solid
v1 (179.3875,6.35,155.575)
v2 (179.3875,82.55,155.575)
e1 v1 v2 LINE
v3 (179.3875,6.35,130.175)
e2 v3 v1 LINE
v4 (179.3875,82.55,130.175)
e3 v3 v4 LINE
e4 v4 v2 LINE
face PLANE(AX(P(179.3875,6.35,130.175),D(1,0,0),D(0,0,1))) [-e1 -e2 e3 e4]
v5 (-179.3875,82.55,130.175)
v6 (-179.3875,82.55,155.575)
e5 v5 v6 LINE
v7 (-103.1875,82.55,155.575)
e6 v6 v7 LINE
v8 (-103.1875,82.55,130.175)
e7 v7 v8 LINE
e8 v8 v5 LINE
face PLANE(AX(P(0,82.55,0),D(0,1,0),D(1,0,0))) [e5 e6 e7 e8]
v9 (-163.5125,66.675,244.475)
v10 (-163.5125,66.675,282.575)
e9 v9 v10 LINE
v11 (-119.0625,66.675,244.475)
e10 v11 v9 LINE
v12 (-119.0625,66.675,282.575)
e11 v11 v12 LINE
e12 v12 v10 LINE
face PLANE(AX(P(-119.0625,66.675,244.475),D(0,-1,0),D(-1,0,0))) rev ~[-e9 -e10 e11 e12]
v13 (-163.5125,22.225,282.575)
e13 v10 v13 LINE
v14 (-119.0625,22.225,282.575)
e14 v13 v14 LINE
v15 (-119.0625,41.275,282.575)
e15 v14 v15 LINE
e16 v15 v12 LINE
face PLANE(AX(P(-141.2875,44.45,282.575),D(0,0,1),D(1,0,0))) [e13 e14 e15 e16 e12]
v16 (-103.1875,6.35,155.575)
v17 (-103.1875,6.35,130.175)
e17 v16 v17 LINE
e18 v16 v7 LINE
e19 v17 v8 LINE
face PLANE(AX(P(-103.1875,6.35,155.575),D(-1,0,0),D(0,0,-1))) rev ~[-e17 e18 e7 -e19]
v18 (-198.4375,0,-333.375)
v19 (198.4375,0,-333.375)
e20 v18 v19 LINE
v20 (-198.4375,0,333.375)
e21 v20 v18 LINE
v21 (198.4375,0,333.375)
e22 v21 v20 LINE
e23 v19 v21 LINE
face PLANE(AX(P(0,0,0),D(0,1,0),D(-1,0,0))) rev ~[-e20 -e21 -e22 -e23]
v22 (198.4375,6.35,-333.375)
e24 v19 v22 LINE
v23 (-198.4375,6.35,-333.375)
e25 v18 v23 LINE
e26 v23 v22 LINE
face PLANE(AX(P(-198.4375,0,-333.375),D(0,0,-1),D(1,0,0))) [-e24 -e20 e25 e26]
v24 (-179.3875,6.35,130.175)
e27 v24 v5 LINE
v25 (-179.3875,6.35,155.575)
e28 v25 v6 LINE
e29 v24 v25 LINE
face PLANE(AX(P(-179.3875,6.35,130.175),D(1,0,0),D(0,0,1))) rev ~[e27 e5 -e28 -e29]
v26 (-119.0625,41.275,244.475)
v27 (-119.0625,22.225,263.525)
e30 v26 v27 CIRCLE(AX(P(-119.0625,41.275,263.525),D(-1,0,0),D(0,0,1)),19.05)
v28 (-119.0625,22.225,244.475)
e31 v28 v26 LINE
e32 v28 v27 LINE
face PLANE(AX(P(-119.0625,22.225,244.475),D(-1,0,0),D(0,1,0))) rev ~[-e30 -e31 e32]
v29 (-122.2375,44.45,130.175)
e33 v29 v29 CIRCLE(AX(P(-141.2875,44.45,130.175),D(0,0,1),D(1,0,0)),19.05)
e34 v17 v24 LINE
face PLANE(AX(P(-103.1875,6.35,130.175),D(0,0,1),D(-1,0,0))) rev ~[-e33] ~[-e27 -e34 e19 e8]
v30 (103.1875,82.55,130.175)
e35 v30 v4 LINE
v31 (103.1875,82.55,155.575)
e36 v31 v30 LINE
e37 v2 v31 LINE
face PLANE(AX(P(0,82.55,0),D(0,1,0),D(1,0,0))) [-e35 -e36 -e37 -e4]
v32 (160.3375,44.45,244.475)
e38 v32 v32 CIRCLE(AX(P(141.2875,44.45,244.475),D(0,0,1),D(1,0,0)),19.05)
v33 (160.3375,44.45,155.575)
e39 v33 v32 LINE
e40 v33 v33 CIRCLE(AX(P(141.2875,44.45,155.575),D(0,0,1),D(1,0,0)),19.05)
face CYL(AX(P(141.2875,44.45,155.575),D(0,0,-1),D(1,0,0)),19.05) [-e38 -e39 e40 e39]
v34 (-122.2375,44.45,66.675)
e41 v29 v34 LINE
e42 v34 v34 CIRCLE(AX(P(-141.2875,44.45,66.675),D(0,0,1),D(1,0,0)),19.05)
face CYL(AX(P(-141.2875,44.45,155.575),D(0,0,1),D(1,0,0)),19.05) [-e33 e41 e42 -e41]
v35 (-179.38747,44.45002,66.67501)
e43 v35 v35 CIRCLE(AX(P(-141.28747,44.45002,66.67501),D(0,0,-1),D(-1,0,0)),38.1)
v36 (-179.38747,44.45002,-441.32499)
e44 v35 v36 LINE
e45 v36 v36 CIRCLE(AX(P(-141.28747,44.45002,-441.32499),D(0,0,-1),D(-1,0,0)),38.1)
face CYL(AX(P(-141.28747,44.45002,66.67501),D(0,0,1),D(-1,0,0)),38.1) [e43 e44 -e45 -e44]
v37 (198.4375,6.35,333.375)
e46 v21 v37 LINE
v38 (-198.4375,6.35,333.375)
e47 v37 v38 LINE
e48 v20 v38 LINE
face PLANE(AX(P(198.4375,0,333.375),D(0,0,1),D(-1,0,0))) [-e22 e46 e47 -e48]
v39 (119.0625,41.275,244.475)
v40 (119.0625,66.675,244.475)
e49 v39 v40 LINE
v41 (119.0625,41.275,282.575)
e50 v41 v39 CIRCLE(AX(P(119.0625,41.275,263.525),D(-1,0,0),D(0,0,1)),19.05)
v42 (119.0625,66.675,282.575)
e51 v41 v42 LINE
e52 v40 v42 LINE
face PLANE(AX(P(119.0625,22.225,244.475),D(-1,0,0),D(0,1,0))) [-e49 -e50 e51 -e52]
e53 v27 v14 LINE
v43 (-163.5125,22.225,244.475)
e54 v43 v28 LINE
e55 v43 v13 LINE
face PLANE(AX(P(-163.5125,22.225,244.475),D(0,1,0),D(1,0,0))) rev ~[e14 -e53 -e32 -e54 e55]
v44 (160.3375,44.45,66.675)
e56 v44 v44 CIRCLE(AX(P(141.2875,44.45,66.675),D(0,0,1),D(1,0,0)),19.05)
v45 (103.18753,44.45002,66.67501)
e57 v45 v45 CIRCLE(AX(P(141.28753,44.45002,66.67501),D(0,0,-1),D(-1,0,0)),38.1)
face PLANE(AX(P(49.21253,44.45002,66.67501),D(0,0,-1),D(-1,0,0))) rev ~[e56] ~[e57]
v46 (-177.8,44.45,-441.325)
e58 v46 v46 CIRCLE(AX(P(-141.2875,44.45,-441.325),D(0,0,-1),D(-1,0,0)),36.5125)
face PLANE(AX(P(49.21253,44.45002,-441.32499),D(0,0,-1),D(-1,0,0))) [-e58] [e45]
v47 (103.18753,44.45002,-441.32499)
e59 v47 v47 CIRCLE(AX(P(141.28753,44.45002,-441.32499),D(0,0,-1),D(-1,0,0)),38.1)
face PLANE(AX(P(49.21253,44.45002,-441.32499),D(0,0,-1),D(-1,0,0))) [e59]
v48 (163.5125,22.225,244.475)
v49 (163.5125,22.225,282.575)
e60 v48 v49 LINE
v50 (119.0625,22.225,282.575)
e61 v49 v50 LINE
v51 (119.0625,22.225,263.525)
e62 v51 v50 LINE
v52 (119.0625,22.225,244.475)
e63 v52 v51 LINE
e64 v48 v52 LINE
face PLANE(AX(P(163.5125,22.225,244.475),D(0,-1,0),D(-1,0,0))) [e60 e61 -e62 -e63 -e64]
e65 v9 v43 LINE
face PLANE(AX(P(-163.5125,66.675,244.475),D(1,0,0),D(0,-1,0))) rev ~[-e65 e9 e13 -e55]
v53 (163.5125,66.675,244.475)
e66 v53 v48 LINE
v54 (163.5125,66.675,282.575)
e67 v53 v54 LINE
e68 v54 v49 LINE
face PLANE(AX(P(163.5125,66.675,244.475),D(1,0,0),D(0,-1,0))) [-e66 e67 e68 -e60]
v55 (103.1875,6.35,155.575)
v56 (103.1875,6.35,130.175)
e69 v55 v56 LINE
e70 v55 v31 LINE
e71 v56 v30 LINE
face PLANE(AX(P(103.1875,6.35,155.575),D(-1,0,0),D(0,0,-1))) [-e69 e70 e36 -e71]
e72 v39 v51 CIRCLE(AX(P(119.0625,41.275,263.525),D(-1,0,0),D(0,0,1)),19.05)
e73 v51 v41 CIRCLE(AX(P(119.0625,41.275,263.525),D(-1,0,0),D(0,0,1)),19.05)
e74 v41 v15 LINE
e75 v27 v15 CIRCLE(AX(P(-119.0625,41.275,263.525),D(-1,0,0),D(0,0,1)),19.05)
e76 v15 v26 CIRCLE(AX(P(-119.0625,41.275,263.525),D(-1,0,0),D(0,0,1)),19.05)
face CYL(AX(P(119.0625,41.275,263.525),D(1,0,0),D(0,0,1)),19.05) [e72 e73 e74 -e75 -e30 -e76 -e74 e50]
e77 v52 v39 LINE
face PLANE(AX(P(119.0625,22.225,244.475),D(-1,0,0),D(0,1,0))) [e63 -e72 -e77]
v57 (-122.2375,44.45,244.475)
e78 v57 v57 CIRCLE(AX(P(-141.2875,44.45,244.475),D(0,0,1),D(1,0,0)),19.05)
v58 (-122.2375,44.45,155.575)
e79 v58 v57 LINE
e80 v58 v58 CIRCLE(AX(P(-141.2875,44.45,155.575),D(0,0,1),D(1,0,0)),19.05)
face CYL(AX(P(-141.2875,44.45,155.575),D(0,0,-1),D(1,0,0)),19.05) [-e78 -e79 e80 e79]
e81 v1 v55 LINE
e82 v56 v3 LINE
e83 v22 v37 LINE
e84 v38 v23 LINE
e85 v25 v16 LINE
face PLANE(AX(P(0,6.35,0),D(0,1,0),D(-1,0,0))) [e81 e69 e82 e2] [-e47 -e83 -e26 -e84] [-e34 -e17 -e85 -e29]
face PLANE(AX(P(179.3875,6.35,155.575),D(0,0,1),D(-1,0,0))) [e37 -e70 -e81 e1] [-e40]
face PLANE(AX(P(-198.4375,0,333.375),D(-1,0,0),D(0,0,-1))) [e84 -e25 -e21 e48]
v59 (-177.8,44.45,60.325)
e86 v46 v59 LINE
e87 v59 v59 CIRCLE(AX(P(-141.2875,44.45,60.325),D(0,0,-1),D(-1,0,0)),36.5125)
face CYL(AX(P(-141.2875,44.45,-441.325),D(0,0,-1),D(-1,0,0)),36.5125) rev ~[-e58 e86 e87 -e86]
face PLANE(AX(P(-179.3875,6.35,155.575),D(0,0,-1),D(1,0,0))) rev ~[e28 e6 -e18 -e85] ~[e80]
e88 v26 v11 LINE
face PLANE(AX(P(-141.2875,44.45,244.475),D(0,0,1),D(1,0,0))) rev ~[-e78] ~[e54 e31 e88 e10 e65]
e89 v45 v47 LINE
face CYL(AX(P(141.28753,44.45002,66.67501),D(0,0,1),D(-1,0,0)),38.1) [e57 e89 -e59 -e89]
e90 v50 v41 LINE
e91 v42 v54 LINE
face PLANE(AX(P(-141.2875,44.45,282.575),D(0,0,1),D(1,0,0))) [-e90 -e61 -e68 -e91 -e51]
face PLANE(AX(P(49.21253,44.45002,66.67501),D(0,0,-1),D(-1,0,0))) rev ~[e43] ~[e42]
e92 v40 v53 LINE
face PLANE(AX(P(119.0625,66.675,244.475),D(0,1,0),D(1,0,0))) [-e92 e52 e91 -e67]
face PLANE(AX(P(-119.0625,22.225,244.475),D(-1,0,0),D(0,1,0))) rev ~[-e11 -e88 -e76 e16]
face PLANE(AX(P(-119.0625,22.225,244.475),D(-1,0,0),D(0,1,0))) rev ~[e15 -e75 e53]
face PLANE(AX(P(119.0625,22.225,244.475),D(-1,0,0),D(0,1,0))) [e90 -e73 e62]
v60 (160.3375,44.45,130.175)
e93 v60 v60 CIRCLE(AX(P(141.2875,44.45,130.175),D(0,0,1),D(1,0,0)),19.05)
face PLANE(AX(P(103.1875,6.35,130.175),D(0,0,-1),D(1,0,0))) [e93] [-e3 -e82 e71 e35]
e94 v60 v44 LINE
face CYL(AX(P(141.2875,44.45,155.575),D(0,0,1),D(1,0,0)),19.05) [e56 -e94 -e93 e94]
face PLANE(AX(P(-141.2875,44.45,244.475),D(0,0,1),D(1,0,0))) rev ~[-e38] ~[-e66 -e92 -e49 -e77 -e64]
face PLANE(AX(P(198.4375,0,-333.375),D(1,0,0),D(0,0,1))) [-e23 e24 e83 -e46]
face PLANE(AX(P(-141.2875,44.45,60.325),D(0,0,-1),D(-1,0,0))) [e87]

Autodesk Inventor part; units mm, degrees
ref_plane "YZ Plane" through (0, 0, 0) normal (1, 0, 0) x (0, 1, 0)
ref_plane "XZ Plane" through (0, 0, 0) normal (0, 1, 0) x (-1, 0, 0)
ref_plane "XY Plane" through (0, 0, 0) normal (0, 0, 1) x (1, 0, 0)
sketch "Sketch1" plane through (0, 0, 0) normal (0, 1, 0) x (-1, 0, 0)
  line L0 (198.4375, 333.375) -> (198.4375, -333.375)
  line L1 (198.4375, -333.375) -> (-198.4375, -333.375)
  line L2 (-198.4375, -333.375) -> (-198.4375, 333.375)
  line L3 (-198.4375, 333.375) -> (198.4375, 333.375)
  line L4 (198.4375, 333.375) -> (-198.4375, -333.375) construction
  line L5 (198.4375, -333.375) -> (-198.4375, 333.375) construction
  point P0 (0, 0)
  dimension "d0" = 666.75
  dimension "d1" = 396.875
extrude "Extrusion1" add sketch "Sketch1" along normal blind 6.35
sketch "Sketch2" plane through (0, 6.35, 0) normal (0, 1, 0) x (1, 0, 0)
  line L0 (179.3875, -155.575) -> (103.1875, -155.575)
  line L1 (103.1875, -155.575) -> (103.1875, -130.175)
  line L2 (103.1875, -130.175) -> (179.3875, -130.175)
  line L3 (179.3875, -130.175) -> (179.3875, -155.575)
  line L4 (198.4375, -333.375) -> (198.4375, 333.375) projected
  line L5 (-179.3875, -155.575) -> (-103.1875, -155.575)
  line L6 (-103.1875, -155.575) -> (-103.1875, -130.175)
  line L7 (-103.1875, -130.175) -> (-179.3875, -130.175)
  line L8 (-179.3875, -130.175) -> (-179.3875, -155.575)
  line L9 (-198.4375, 333.375) -> (-198.4375, -333.375) projected
  line L10 (198.4375, -333.375) -> (-198.4375, -333.375) projected
  point P0 (0, 0)
  dimension "d4" = 76.2
  dimension "d5" = 25.4
  dimension "d6" = 19.05
  dimension "d7" = 76.2
  dimension "d8" = 25.4
  dimension "d9" = 19.05
  dimension "d10" = 177.8
  dimension "d11" = 177.8
extrude "Extrusion2" add sketch "Sketch2" along normal blind 76.2
sketch "Sketch3" plane through (-179.3875, 6.35, 155.575) normal (0, 0, 1) x (1, 0, 0)
  circle A0 centre (38.1, 38.1) radius 19.05
  circle A1 centre (228.6, 38.1) radius 19.05
  point P0 (179.3875, -6.35)
  dimension "d14" = 38.1
  dimension "d15" = 38.1
extrude "Extrusion3" cut sketch "Sketch3" against normal blind 76.2
sketch "Sketch4" plane through (-179.3875, 6.35, 155.575) normal (0, 0, 1) x (1, 0, 0)
  circle A0 centre (38.1, 38.1) radius 19.05 projected
  circle A1 centre (38.1, 38.1) radius 19.05
  circle A2 centre (320.675, 38.1) radius 19.05
  point P0 (179.3875, -6.35)
  dimension "d44" = 38.1
extrude "Extrusion4" add sketch "Sketch4" along normal blind 88.9 and the other way blind 88.9
sketch "Sketch5" plane through (49.2125, 44.45, 66.675) normal (0, 0, -1) x (-1, 0, 0)
  circle A0 centre (190.5, 0) radius 19.05 projected
  circle A1 centre (190.5, 0) radius 38.1
  circle A2 centre (-92.075, 0) radius 19.05 projected
  circle A3 centre (-92.075, 0) radius 38.1
  point P0 (49.2125, -44.45)
  dimension "d23" = 76.2
extrude "Extrusion5" add sketch "Sketch5" along normal blind 508 contours A0 | A1 | A2 | A3
sketch "Sketch6" plane through (-141.2875, 44.45, 244.475) normal (0, 0, 1) x (1, 0, 0)
  line L0 (-22.225, -22.225) -> (22.225, -22.225)
  line L1 (22.225, -22.225) -> (22.225, 22.225)
  line L2 (22.225, 22.225) -> (-22.225, 22.225)
  line L3 (-22.225, 22.225) -> (-22.225, -22.225)
  line L4 (-22.225, -22.225) -> (22.225, 22.225) construction
  line L5 (22.225, -22.225) -> (-22.225, 22.225) construction
  line L6 (304.8, -22.225) -> (260.35, -22.225)
  line L7 (260.35, -22.225) -> (260.35, 22.225)
  line L8 (260.35, 22.225) -> (304.8, 22.225)
  line L9 (304.8, 22.225) -> (304.8, -22.225)
  line L10 (304.8, -22.225) -> (260.35, 22.225) construction
  line L11 (260.35, -22.225) -> (304.8, 22.225) construction
  line L12 (-38.1, -38.1) -> (-38.1, 38.1) projected
  line L13 (-38.1, 38.1) -> (38.1, 38.1) projected
  point P0 (141.2875, -44.45)
  point P1 (0, 0)
  point P2 (282.575, 0)
  dimension "d26" = 44.45
  dimension "d27" = 44.45
  dimension "d28" = 44.45
  dimension "d29" = 44.45
  dimension "d30" = 282.575
  dimension "d31" = 38.1
  dimension "d32" = 38.1
extrude "Extrusion6" add sketch "Sketch6" along normal blind 38.1
sketch "Sketch7" plane through (119.0625, 22.225, 244.475) normal (-1, 0, 0) x (0, 0, 1)
  circle A0 centre (19.05, 19.05) radius 19.05
  line L0 (0, 0) -> (0, 44.45) projected
  line L1 (0, 0) -> (38.1, 0) projected
  point P0 (-244.475, -22.225)
  dimension "d35" = 38.1
  dimension "d36" = 19.05
  dimension "d37" = 19.05
extrude "Extrusion7" add sketch "Sketch7" along normal blind 238.125 contours A0
sketch "Sketch9" plane through (-141.2875, 44.45, -441.325) normal (0, 0, -1) x (-1, 0, 0)
  circle A0 centre (0, 0) radius 36.5125
  point P0 (-141.2875, -44.45)
  dimension "d45" = 73.025
extrude "Extrusion9" cut sketch "Sketch9" against normal blind 501.65
properties part number "Cannon Barrel"
